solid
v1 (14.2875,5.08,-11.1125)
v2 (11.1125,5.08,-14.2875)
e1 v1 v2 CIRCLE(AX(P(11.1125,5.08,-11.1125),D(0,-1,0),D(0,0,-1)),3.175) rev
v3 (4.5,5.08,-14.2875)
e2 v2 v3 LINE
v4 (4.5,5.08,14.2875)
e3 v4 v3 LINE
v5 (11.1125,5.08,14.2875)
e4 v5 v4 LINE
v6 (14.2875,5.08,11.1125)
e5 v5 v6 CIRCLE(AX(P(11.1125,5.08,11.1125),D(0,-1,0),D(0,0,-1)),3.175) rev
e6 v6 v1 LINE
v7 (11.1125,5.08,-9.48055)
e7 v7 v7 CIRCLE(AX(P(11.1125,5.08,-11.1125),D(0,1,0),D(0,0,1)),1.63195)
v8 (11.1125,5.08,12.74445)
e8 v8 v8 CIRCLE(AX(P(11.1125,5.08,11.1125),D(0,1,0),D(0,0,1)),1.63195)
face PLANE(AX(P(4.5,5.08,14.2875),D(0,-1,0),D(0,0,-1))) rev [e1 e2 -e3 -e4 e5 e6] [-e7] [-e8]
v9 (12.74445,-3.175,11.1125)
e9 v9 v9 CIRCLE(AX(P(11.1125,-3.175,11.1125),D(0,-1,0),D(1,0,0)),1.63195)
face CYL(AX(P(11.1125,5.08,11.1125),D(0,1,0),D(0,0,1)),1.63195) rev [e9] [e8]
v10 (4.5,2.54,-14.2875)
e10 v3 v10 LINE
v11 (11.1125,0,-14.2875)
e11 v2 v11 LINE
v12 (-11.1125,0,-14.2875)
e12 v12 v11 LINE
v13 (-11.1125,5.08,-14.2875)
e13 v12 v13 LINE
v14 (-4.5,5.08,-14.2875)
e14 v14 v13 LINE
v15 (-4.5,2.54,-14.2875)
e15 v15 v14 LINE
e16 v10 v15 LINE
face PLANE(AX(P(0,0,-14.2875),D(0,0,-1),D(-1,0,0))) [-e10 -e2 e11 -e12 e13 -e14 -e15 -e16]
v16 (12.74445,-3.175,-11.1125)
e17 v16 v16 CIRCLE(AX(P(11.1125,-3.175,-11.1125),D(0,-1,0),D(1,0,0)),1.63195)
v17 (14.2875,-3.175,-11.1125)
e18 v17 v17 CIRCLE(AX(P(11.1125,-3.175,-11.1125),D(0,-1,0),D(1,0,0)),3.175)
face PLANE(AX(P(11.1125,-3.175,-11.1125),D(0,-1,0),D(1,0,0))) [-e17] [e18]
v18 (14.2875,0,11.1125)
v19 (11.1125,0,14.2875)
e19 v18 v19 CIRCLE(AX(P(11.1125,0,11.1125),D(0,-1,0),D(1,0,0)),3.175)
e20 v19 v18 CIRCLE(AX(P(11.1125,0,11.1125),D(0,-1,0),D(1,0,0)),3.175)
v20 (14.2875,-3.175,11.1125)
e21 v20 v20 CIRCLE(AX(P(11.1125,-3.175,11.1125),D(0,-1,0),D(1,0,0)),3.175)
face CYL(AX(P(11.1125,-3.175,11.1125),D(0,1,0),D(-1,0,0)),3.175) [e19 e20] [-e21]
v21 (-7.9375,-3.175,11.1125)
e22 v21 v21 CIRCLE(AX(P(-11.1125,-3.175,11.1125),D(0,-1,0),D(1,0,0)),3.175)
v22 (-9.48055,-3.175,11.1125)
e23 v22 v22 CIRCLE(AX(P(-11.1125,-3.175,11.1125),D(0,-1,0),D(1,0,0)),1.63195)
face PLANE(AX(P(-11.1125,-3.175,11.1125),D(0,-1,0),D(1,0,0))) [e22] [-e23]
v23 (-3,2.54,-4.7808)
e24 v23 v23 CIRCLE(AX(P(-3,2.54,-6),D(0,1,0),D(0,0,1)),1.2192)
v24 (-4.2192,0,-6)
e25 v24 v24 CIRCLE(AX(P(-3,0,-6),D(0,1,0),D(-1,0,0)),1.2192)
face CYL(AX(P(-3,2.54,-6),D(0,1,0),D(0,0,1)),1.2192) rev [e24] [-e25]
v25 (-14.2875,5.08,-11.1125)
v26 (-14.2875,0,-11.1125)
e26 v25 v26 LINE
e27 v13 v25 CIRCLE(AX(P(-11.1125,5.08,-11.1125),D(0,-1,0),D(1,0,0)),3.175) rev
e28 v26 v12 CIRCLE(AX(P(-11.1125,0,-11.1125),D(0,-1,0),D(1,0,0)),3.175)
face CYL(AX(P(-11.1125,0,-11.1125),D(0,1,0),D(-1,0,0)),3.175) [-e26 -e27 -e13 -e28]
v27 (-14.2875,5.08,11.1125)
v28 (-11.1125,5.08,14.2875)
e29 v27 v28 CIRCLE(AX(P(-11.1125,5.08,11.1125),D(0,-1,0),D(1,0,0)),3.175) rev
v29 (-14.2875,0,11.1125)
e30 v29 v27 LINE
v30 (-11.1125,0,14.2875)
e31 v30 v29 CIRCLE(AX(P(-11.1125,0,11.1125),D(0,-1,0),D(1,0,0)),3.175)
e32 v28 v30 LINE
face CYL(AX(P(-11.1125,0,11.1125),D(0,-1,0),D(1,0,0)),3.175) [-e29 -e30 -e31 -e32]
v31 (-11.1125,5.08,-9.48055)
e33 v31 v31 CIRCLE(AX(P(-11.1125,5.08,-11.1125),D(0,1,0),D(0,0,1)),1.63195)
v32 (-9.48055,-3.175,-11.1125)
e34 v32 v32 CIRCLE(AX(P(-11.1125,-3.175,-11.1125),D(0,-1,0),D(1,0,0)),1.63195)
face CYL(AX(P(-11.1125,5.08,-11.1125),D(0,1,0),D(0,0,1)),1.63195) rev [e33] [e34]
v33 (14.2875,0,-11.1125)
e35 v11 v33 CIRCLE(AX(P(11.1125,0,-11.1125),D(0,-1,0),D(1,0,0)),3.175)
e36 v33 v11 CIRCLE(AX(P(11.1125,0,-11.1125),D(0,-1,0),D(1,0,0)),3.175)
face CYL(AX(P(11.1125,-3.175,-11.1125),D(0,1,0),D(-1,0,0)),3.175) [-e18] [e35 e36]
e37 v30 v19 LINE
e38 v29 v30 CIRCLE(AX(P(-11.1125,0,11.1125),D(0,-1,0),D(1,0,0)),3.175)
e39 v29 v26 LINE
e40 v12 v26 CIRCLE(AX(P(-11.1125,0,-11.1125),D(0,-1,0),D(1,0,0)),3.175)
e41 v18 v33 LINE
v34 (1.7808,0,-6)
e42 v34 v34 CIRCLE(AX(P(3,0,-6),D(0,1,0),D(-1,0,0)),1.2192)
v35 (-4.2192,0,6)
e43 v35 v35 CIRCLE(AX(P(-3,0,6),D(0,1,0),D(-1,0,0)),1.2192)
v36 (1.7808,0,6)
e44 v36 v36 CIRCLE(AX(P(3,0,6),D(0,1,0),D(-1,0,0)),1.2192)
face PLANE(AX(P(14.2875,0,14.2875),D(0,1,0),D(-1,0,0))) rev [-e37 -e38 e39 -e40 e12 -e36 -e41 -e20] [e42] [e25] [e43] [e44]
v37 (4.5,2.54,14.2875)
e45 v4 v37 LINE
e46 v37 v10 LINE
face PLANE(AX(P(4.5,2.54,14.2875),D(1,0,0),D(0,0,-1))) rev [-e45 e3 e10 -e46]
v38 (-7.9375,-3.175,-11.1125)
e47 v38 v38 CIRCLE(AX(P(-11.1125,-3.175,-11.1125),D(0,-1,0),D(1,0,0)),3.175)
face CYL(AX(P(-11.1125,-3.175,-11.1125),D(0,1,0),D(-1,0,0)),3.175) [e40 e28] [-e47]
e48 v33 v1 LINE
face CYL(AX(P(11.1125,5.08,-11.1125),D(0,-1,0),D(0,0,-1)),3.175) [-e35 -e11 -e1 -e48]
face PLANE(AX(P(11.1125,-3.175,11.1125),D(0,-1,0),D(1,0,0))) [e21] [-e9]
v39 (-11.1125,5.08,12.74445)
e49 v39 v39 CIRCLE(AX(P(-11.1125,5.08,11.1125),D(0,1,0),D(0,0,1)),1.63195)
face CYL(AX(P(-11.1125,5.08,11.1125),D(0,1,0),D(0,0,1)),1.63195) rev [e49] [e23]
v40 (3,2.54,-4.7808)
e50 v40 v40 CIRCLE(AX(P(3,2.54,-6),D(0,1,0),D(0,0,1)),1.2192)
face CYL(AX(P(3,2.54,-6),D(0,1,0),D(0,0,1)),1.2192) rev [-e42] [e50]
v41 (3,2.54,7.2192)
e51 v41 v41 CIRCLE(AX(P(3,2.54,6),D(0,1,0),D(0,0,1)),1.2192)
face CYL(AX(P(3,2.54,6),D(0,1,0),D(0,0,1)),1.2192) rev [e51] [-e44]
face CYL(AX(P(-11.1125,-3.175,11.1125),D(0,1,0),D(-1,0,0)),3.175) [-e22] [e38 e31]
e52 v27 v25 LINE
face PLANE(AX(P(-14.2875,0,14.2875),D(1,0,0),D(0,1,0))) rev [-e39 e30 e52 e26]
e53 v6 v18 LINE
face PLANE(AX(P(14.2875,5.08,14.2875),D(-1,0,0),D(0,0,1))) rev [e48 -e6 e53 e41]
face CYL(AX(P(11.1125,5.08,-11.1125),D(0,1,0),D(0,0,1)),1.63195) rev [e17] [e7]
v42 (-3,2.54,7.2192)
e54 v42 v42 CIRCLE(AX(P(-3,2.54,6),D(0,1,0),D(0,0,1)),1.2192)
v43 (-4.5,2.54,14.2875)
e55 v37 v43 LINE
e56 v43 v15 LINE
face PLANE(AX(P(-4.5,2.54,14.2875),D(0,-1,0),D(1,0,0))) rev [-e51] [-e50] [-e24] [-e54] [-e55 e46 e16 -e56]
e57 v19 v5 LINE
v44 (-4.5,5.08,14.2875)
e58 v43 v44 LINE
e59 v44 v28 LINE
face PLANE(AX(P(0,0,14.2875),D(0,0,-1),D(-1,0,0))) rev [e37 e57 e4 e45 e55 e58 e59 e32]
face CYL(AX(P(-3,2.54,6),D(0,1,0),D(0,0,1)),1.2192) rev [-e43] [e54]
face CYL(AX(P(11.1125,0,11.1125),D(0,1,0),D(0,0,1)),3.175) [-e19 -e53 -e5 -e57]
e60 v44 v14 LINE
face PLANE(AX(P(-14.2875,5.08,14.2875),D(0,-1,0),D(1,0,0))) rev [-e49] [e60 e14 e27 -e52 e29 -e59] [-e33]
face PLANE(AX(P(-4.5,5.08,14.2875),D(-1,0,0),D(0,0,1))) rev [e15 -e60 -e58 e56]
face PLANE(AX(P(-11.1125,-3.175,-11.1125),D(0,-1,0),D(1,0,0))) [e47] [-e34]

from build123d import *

# Parameters (mm, degrees)
BOSS_EXTRUDE1_DEPTH   = 14.2875
F_4_CLEARANCE_HOLE1_D = 3.2639
BOSS_EXTRUDE2_START   = 3.175
SKETCH6_R             = 3.175
SKETCH6_R_2           = 1.63195
BOSS_EXTRUDE2_DEPTH   = 3.175
FILLET1_R             = 3.175
F_2_CLEARANCE_HOLE2_D = 2.4384


with BuildPart() as part:
    # Sketch2 → Boss-Extrude1 (new, symmetric)
    with BuildSketch(Plane.XY):
        Polygon((-14.2875, 0), (-14.2875, 5.08), (-4.5, 5.08), (-4.5, 2.54), (4.5, 2.54), (4.5, 5.08), (14.2875, 5.08), (14.2875, 0), align=None)
    extrude(amount=BOSS_EXTRUDE1_DEPTH, both=True)

    # #4 Clearance Hole1 (through all)
    with Locations(Plane(origin=(0, 5.08, 0), x_dir=(1, 0, 0), z_dir=(0, 1, 0))):
        with Locations((-11.1125, 11.1125), (11.1125, -11.1125), (11.1125, 11.1125), (-11.1125, -11.1125)):
            Hole(F_4_CLEARANCE_HOLE1_D / 2)

    # Sketch6 → Boss-Extrude2 (add)
    # profile 1 of 4: a face of its own
    with BuildSketch(Plane.XZ.offset(BOSS_EXTRUDE2_START)):
        with Locations(Location((-11.1125, 11.1125, 0), (0, 0, 180))):
            Circle(SKETCH6_R)
        with Locations(Location((-11.1125, 11.1125, 0), (0, 0, 90))):
            Circle(SKETCH6_R_2, mode=Mode.SUBTRACT)
    # profile 2 of 4: a face of its own
    with BuildSketch(Plane.XZ.offset(BOSS_EXTRUDE2_START)):
        with Locations((11.1125, 11.1125)):
            Circle(SKETCH6_R)
        with Locations(Location((11.1125, 11.1125, 0), (0, 0, 90))):
            Circle(SKETCH6_R_2, mode=Mode.SUBTRACT)
    # profile 3 of 4: a face of its own
    with BuildSketch(Plane.XZ.offset(BOSS_EXTRUDE2_START)):
        with Locations((11.1125, -11.1125)):
            Circle(SKETCH6_R)
        with Locations(Location((11.1125, -11.1125, 0), (0, 0, 90))):
            Circle(SKETCH6_R_2, mode=Mode.SUBTRACT)
    # profile 4 of 4: a face of its own
    with BuildSketch(Plane.XZ.offset(BOSS_EXTRUDE2_START)):
        with Locations(Location((-11.1125, -11.1125, 0), (0, 0, 180))):
            Circle(SKETCH6_R)
        with Locations(Location((-11.1125, -11.1125, 0), (0, 0, 90))):
            Circle(SKETCH6_R_2, mode=Mode.SUBTRACT)
    extrude(amount=-BOSS_EXTRUDE2_DEPTH)

    # Fillet1
    fillet1_edges = [part.edges().sort_by_distance(p)[0] for p in [
        (-14.2875, 2.54, -14.2875),
        (-14.2875, 2.54, 14.2875),
        (14.2875, 2.54, -14.2875),
        (14.2875, 2.54, 14.2875),
    ]]
    fillet(fillet1_edges, radius=FILLET1_R - 0.0001)  # a hair under: the kernel refuses the full size

    # #2 Clearance Hole2 (through all)
    with Locations(Plane(origin=(0, 2.54, 0), x_dir=(1, 0, 0), z_dir=(0, 1, 0))):
        with Locations((-2.999999969, 5.999999938), (2.999999969, -5.999999938), (2.999999969, 5.999999938), (-2.999999969, -5.999999938)):
            Hole(F_2_CLEARANCE_HOLE2_D / 2)


solid = part.part
